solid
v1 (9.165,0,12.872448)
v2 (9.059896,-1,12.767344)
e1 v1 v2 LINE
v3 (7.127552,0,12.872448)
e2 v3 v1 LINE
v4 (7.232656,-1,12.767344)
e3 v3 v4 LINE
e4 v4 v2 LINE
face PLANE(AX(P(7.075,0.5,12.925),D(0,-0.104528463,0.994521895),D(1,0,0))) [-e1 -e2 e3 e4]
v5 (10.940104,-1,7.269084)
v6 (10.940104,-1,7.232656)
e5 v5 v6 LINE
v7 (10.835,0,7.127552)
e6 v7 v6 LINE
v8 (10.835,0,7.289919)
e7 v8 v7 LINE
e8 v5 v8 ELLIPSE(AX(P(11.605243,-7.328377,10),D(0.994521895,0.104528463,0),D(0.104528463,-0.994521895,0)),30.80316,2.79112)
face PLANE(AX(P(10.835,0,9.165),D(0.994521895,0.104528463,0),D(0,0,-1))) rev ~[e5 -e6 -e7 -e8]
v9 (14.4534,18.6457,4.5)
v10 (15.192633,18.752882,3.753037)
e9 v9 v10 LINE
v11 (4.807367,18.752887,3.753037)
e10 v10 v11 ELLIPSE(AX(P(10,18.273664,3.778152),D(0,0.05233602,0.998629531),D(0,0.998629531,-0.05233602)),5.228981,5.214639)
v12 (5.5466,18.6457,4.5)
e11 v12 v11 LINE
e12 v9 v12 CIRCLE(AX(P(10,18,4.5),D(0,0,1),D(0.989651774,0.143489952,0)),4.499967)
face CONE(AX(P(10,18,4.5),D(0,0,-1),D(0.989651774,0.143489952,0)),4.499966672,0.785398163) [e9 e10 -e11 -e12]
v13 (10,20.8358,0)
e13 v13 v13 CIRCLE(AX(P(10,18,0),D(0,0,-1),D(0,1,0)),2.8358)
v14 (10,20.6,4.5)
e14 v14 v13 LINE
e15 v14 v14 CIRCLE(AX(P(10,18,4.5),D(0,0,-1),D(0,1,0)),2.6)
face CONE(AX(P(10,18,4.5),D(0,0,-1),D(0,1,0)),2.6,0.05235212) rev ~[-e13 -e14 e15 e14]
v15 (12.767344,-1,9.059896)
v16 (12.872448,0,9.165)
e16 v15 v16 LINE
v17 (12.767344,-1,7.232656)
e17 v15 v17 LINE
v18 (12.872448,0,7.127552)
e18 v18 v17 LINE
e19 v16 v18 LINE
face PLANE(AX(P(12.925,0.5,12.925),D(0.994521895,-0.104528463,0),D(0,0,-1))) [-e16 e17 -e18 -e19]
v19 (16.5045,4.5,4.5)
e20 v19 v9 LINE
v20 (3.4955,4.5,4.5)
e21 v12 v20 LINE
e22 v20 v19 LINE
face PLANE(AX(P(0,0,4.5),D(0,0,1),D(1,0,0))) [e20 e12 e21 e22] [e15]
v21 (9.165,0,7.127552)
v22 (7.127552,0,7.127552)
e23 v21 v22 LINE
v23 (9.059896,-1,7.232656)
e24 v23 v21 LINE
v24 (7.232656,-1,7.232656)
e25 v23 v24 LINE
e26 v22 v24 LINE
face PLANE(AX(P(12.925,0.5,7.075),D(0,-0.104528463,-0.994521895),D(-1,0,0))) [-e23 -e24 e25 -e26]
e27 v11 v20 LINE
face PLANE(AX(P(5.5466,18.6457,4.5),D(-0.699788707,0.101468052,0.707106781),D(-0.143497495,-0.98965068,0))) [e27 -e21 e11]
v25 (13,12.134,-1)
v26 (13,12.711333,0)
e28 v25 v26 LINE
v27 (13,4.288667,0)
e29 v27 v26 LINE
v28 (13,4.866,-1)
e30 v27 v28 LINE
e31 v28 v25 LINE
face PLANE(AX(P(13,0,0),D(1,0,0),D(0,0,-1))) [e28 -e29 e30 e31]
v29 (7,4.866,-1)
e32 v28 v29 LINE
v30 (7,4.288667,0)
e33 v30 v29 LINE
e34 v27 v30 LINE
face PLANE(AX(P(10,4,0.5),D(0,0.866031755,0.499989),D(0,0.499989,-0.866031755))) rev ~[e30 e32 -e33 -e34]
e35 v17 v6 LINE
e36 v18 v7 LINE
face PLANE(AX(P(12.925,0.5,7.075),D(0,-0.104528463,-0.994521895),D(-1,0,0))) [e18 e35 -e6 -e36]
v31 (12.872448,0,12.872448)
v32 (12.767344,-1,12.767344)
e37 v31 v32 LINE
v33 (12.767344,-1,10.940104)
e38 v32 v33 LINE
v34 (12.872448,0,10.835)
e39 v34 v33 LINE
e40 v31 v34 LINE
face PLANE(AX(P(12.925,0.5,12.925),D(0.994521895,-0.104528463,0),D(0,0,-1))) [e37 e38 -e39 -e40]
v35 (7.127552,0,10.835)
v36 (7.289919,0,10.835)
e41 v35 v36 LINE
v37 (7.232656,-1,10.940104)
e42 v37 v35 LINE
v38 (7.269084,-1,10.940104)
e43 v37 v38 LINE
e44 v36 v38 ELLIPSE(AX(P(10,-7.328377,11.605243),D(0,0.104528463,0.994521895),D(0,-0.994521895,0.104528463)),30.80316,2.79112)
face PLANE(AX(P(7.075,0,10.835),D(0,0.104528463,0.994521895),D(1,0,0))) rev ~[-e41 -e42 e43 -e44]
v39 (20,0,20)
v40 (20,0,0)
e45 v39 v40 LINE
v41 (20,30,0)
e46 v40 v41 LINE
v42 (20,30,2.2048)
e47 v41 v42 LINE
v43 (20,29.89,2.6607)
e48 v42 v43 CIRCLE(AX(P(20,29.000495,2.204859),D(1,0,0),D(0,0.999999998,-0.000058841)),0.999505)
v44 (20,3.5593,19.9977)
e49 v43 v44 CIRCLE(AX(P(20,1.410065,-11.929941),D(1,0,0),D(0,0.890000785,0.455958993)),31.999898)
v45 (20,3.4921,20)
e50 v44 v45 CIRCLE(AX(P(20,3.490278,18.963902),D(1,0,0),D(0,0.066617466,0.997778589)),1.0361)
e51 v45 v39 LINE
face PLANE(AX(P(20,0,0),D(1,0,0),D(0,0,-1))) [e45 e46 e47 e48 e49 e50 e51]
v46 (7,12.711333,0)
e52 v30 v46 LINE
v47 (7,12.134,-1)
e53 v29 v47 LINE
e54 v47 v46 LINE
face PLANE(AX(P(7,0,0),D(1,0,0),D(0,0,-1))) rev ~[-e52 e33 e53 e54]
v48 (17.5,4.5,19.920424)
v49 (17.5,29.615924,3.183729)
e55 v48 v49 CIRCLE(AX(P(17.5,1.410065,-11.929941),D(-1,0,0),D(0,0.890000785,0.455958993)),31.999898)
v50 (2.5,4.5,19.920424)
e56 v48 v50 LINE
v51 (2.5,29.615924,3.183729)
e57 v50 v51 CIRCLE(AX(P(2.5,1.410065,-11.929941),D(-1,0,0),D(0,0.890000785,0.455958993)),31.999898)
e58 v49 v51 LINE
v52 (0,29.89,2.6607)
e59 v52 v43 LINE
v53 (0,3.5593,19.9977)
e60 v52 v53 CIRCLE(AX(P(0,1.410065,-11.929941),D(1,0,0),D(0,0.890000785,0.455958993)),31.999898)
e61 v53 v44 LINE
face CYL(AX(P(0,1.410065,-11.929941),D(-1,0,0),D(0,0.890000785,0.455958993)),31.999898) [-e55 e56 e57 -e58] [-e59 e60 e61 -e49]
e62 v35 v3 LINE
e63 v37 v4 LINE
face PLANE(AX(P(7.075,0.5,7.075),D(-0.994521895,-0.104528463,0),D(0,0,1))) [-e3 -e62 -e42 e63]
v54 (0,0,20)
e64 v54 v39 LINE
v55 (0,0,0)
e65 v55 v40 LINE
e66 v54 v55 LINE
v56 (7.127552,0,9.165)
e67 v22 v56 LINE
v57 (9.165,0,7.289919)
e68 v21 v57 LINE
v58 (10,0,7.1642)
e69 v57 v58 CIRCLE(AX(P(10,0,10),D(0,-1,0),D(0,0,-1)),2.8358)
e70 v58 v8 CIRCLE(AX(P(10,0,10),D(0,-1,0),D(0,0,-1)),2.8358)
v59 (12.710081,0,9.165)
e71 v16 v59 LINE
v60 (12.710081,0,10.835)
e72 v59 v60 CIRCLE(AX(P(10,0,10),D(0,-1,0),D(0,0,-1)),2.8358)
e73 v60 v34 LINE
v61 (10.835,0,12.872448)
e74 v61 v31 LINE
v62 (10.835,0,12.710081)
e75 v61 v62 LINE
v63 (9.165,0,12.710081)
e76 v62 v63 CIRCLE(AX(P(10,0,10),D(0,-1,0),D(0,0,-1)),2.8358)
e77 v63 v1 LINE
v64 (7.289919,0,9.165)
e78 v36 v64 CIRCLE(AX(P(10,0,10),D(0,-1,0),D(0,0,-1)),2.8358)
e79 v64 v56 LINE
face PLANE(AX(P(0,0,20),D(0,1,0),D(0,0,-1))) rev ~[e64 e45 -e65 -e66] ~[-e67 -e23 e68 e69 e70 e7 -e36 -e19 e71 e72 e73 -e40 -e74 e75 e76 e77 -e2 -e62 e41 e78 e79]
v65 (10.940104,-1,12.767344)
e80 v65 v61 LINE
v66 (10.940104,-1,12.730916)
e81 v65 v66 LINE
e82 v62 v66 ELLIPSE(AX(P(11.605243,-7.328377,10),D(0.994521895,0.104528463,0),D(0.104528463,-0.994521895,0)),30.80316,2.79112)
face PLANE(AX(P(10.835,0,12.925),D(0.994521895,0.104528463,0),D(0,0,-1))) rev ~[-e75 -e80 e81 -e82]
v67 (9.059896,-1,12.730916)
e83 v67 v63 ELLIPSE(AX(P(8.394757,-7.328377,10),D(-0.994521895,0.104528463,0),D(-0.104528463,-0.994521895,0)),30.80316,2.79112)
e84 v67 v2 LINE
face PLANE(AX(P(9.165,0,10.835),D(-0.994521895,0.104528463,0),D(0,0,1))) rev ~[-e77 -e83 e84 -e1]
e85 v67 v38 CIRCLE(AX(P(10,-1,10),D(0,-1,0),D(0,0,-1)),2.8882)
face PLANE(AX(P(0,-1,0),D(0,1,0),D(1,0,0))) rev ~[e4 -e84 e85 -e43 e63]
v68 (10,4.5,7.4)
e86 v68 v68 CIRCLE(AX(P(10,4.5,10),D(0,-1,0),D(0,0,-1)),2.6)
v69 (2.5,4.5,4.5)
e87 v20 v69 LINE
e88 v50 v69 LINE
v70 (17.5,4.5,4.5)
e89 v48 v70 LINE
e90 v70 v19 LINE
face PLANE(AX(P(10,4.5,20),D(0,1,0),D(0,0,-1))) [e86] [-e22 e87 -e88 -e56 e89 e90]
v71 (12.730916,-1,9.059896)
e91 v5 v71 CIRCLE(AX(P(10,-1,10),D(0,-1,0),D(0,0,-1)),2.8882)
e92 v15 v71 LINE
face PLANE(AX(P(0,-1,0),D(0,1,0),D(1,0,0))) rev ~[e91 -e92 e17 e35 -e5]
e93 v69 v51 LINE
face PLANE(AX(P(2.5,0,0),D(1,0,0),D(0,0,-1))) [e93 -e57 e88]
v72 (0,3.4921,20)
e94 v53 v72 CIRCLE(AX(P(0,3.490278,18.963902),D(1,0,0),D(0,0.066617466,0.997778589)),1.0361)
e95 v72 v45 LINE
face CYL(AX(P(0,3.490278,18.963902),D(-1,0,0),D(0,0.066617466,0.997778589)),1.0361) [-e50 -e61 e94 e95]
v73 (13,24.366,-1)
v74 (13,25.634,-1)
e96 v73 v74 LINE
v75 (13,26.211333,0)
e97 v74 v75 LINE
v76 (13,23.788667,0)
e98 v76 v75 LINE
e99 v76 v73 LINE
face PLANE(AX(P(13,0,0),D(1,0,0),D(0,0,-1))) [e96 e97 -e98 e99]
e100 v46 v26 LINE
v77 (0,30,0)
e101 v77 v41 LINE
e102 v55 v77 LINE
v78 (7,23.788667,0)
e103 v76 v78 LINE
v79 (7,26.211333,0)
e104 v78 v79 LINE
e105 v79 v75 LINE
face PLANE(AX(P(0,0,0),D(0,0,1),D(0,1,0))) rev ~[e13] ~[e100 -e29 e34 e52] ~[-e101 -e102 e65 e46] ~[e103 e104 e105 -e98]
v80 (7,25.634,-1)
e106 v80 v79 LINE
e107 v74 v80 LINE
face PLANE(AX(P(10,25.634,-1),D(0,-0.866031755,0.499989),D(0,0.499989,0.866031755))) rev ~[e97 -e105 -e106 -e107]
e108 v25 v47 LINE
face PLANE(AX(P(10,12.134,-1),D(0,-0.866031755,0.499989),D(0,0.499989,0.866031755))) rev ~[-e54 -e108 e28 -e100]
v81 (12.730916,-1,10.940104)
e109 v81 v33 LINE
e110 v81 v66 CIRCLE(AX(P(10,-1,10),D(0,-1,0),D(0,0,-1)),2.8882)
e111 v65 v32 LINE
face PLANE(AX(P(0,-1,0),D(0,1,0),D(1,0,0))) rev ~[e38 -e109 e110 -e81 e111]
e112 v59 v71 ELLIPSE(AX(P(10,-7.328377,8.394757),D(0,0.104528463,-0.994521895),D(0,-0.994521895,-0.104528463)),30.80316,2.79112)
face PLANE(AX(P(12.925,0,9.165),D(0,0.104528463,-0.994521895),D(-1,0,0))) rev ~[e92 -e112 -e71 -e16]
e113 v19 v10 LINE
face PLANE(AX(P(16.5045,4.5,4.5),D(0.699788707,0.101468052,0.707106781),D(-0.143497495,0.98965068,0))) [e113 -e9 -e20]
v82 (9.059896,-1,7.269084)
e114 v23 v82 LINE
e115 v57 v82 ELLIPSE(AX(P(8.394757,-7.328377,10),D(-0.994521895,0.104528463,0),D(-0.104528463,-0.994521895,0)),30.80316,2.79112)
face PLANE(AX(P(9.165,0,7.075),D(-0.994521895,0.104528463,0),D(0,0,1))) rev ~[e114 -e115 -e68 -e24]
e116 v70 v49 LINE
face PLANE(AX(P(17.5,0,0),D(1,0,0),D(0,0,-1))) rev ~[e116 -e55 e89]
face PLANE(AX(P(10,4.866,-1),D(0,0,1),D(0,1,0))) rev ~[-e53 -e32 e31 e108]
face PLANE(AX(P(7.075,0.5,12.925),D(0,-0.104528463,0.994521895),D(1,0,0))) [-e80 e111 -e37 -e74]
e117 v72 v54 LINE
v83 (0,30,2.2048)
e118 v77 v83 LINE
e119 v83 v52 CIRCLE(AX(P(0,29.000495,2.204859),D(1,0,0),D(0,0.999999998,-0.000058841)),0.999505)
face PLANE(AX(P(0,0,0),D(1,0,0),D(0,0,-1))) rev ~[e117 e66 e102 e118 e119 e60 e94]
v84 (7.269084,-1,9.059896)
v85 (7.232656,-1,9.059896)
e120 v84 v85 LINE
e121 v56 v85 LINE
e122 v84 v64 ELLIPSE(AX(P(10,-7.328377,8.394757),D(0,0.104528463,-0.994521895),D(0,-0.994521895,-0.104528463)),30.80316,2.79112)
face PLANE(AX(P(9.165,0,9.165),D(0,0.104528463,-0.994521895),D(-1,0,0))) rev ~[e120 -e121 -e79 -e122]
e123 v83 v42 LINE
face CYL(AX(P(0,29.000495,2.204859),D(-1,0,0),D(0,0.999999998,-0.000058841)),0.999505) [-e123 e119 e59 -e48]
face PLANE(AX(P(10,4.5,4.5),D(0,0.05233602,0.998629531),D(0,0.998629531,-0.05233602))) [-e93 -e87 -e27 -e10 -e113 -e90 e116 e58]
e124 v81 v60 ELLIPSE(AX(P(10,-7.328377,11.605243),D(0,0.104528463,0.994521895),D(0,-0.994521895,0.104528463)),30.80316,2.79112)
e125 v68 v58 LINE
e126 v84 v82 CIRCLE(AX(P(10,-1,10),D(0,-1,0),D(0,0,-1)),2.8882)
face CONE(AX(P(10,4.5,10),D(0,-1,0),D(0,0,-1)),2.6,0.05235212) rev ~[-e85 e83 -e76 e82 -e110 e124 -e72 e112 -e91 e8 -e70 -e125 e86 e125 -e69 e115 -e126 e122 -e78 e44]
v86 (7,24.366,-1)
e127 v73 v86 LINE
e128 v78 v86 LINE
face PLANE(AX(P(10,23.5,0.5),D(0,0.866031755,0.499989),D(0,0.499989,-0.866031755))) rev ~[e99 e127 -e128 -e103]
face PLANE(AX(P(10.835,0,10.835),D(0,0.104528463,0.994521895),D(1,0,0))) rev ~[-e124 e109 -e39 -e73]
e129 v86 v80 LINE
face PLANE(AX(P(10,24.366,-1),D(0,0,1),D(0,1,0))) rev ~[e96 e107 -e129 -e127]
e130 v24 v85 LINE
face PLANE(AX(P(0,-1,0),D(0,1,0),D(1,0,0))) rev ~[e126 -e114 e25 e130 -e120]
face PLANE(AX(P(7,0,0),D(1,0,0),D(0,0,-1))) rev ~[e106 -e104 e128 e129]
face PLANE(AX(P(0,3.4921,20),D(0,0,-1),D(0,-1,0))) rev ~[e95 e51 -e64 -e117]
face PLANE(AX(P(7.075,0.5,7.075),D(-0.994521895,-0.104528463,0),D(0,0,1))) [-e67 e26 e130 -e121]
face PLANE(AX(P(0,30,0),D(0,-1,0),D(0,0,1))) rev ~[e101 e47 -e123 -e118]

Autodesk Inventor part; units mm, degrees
sketch "Sketch_1" plane through (0, 0, 0) normal (1, 0, 0) x (0, 0, -1)
  line L0 (-20, 3.4921) -> (-20, 0)
  line L1 (-20, 0) -> (0, 0)
  line L2 (0, 0) -> (0, 30)
  line L3 (0, 30) -> (-2.2048, 30)
  arc A0 (-2.2048, 30) -> (-2.6607, 29.89) centre (-2.2048, 29) ccw
  arc A1 (-2.6607, 29.89) -> (-19.9977, 3.5593) centre (11.93, 1.41) ccw
  arc A2 (-19.9977, 3.5593) -> (-20, 3.4921) centre (-19, 3.4921) ccw
extrude "Extrusion1" add sketch "Sketch_1" along normal blind 20
sketch "Sketch_2" plane through (10, 0, 0) normal (1, 0, 0) x (0, 0, -1)
  line L0 (-20, 30) -> (-20, 4.5)
  line L1 (-20, 4.5) -> (-4.5, 4.5)
  line L2 (-4.5, 4.5) -> (-3.1636, 30)
  line L3 (-3.1636, 30) -> (-20, 30)
extrude "Extrusion2" cut sketch "Sketch_2" along normal mid plane 15
sketch "Sketch_5" plane through (10, 0, 0) normal (1, 0, 0) x (0, 0, -1)
  line L0 (-0.5, 26.5) -> (-0.5, 23.5)
  line L1 (-0.5, 23.5) -> (1, 24.366)
  line L2 (1, 24.366) -> (1, 25.634)
  line L3 (1, 25.634) -> (-0.5, 26.5)
extrude "Extrusion3" add sketch "Sketch_5" along normal mid plane 6
sketch "Sketch_6" plane through (10, 0, 0) normal (1, 0, 0) x (0, 0, -1)
  line L0 (-0.5, 13) -> (-0.5, 4)
  line L1 (-0.5, 4) -> (1, 4.866)
  line L2 (1, 4.866) -> (1, 12.134)
  line L3 (1, 12.134) -> (-0.5, 13)
extrude "Extrusion4" add sketch "Sketch_6" along normal mid plane 6
sketch "Sketch_3" plane through (0, 0, 4.5) normal (0, 0, 1) x (1, 0, 0)
  line L0 (3.4955, 4.5) -> (16.5045, 4.5)
  line L1 (16.5045, 4.5) -> (14.4534, 18.6457)
  arc A0 (14.4534, 18.6457) -> (5.5466, 18.6457) centre (10, 18) ccw
  line L2 (5.5466, 18.6457) -> (3.4955, 4.5)
extrude "Extrusion5" add sketch "Sketch_3" against normal blind 2 draft 45
sketch "Sketch_7" plane through (0, 0.5, 0) normal (0, 1, 0) x (1, 0, 0)
  line L0 (7.075, -12.925) -> (12.925, -12.925)
  line L1 (12.925, -12.925) -> (12.925, -7.075)
  line L2 (12.925, -7.075) -> (7.075, -7.075)
  line L3 (7.075, -7.075) -> (7.075, -12.925)
extrude "Extrusion6" add sketch "Sketch_7" against normal blind 1.5 draft -6
sketch "Sketch_9" plane through (0, 0, 0) normal (0, 1, 0) x (1, 0, 0)
  line L0 (7.075, -10.835) -> (9.165, -10.835)
  line L1 (9.165, -10.835) -> (9.165, -12.925)
  line L2 (9.165, -12.925) -> (10.835, -12.925)
  line L3 (10.835, -12.925) -> (10.835, -10.835)
  line L4 (10.835, -10.835) -> (12.925, -10.835)
  line L5 (12.925, -10.835) -> (12.925, -9.165)
  line L6 (12.925, -9.165) -> (10.835, -9.165)
  line L7 (10.835, -9.165) -> (10.835, -7.075)
  line L8 (10.835, -7.075) -> (9.165, -7.075)
  line L9 (9.165, -7.075) -> (9.165, -9.165)
  line L10 (9.165, -9.165) -> (7.075, -9.165)
  line L11 (7.075, -9.165) -> (7.075, -10.835)
extrude "Extrusion7" cut sketch "Sketch_9" against normal blind 1 draft 6
sketch "Sketch_4" plane through (10, 0, 0) normal (1, 0, 0) x (0, 0, -1)
  line L0 (0, 18) -> (-4.5, 18)
  line L1 (-4.5, 18) -> (-4.5, 20.6)
  line L2 (-4.5, 20.6) -> (0, 20.8358)
  line L3 (0, 20.8358) -> (0, 18)
  line L4 (0, 18) -> (-4.5, 18)
revolve "Revolution1" cut sketch "Sketch_4" angle 360 about axis through (10, 18, 0) along (0, 0, -1)
sketch "Sketch_8" plane through (10, 0, 0) normal (1, 0, 0) x (0, 0, -1)
  line L0 (-10, -1) -> (-10, 4.5)
  line L1 (-10, 4.5) -> (-7.4, 4.5)
  line L2 (-7.4, 4.5) -> (-7.1118, -1)
  line L3 (-7.1118, -1) -> (-10, -1)
  line L4 (-10, -1) -> (-10, 4.5)
revolve "Revolution2" cut sketch "Sketch_8" angle 360 about axis through (10, -1, 10) along (0, -1, 0)
ref_plane "to_bolt1_XY" through (10, 18, 4.5) normal (0, 0, 1) x (1, 0, 0)
ref_plane "to_bolt1_YZ" through (10, 18, 4.5) normal (1, 0, 0) x (0, 1, 0)
ref_plane "to_bolt1_ZX" through (10, 18, 4.5) normal (0, 1, 0) x (0, 0, 1)
ref_plane "to_bolt2_XY" through (10, 4.5, 10) normal (0, 1, 0) x (1, 0, 0)
ref_plane "to_bolt2_YZ" through (10, 4.5, 10) normal (1, 0, 0) x (0, 0, -1)
ref_plane "to_bolt2_ZX" through (10, 4.5, 10) normal (0, 0, -1) x (0, 1, 0)
ref_plane "to_nut1_XY" through (10, 18, -1) normal (0, 0, -1) x (0, 1, 0)
ref_plane "to_nut1_YZ" through (10, 18, -1) normal (0, 1, 0) x (1, 0, 0)
ref_plane "to_nut1_ZX" through (10, 18, -1) normal (1, 0, 0) x (0, 0, -1)
ref_plane "to_nut2_XY" through (10, -1, 10) normal (0, -1, 0) x (0, 0, -1)
ref_plane "to_nut2_YZ" through (10, -1, 10) normal (0, 0, -1) x (1, 0, 0)
ref_plane "to_nut2_ZX" through (10, -1, 10) normal (1, 0, 0) x (0, -1, 0)
properties part number "HBLFSNF5-SEC_b"
